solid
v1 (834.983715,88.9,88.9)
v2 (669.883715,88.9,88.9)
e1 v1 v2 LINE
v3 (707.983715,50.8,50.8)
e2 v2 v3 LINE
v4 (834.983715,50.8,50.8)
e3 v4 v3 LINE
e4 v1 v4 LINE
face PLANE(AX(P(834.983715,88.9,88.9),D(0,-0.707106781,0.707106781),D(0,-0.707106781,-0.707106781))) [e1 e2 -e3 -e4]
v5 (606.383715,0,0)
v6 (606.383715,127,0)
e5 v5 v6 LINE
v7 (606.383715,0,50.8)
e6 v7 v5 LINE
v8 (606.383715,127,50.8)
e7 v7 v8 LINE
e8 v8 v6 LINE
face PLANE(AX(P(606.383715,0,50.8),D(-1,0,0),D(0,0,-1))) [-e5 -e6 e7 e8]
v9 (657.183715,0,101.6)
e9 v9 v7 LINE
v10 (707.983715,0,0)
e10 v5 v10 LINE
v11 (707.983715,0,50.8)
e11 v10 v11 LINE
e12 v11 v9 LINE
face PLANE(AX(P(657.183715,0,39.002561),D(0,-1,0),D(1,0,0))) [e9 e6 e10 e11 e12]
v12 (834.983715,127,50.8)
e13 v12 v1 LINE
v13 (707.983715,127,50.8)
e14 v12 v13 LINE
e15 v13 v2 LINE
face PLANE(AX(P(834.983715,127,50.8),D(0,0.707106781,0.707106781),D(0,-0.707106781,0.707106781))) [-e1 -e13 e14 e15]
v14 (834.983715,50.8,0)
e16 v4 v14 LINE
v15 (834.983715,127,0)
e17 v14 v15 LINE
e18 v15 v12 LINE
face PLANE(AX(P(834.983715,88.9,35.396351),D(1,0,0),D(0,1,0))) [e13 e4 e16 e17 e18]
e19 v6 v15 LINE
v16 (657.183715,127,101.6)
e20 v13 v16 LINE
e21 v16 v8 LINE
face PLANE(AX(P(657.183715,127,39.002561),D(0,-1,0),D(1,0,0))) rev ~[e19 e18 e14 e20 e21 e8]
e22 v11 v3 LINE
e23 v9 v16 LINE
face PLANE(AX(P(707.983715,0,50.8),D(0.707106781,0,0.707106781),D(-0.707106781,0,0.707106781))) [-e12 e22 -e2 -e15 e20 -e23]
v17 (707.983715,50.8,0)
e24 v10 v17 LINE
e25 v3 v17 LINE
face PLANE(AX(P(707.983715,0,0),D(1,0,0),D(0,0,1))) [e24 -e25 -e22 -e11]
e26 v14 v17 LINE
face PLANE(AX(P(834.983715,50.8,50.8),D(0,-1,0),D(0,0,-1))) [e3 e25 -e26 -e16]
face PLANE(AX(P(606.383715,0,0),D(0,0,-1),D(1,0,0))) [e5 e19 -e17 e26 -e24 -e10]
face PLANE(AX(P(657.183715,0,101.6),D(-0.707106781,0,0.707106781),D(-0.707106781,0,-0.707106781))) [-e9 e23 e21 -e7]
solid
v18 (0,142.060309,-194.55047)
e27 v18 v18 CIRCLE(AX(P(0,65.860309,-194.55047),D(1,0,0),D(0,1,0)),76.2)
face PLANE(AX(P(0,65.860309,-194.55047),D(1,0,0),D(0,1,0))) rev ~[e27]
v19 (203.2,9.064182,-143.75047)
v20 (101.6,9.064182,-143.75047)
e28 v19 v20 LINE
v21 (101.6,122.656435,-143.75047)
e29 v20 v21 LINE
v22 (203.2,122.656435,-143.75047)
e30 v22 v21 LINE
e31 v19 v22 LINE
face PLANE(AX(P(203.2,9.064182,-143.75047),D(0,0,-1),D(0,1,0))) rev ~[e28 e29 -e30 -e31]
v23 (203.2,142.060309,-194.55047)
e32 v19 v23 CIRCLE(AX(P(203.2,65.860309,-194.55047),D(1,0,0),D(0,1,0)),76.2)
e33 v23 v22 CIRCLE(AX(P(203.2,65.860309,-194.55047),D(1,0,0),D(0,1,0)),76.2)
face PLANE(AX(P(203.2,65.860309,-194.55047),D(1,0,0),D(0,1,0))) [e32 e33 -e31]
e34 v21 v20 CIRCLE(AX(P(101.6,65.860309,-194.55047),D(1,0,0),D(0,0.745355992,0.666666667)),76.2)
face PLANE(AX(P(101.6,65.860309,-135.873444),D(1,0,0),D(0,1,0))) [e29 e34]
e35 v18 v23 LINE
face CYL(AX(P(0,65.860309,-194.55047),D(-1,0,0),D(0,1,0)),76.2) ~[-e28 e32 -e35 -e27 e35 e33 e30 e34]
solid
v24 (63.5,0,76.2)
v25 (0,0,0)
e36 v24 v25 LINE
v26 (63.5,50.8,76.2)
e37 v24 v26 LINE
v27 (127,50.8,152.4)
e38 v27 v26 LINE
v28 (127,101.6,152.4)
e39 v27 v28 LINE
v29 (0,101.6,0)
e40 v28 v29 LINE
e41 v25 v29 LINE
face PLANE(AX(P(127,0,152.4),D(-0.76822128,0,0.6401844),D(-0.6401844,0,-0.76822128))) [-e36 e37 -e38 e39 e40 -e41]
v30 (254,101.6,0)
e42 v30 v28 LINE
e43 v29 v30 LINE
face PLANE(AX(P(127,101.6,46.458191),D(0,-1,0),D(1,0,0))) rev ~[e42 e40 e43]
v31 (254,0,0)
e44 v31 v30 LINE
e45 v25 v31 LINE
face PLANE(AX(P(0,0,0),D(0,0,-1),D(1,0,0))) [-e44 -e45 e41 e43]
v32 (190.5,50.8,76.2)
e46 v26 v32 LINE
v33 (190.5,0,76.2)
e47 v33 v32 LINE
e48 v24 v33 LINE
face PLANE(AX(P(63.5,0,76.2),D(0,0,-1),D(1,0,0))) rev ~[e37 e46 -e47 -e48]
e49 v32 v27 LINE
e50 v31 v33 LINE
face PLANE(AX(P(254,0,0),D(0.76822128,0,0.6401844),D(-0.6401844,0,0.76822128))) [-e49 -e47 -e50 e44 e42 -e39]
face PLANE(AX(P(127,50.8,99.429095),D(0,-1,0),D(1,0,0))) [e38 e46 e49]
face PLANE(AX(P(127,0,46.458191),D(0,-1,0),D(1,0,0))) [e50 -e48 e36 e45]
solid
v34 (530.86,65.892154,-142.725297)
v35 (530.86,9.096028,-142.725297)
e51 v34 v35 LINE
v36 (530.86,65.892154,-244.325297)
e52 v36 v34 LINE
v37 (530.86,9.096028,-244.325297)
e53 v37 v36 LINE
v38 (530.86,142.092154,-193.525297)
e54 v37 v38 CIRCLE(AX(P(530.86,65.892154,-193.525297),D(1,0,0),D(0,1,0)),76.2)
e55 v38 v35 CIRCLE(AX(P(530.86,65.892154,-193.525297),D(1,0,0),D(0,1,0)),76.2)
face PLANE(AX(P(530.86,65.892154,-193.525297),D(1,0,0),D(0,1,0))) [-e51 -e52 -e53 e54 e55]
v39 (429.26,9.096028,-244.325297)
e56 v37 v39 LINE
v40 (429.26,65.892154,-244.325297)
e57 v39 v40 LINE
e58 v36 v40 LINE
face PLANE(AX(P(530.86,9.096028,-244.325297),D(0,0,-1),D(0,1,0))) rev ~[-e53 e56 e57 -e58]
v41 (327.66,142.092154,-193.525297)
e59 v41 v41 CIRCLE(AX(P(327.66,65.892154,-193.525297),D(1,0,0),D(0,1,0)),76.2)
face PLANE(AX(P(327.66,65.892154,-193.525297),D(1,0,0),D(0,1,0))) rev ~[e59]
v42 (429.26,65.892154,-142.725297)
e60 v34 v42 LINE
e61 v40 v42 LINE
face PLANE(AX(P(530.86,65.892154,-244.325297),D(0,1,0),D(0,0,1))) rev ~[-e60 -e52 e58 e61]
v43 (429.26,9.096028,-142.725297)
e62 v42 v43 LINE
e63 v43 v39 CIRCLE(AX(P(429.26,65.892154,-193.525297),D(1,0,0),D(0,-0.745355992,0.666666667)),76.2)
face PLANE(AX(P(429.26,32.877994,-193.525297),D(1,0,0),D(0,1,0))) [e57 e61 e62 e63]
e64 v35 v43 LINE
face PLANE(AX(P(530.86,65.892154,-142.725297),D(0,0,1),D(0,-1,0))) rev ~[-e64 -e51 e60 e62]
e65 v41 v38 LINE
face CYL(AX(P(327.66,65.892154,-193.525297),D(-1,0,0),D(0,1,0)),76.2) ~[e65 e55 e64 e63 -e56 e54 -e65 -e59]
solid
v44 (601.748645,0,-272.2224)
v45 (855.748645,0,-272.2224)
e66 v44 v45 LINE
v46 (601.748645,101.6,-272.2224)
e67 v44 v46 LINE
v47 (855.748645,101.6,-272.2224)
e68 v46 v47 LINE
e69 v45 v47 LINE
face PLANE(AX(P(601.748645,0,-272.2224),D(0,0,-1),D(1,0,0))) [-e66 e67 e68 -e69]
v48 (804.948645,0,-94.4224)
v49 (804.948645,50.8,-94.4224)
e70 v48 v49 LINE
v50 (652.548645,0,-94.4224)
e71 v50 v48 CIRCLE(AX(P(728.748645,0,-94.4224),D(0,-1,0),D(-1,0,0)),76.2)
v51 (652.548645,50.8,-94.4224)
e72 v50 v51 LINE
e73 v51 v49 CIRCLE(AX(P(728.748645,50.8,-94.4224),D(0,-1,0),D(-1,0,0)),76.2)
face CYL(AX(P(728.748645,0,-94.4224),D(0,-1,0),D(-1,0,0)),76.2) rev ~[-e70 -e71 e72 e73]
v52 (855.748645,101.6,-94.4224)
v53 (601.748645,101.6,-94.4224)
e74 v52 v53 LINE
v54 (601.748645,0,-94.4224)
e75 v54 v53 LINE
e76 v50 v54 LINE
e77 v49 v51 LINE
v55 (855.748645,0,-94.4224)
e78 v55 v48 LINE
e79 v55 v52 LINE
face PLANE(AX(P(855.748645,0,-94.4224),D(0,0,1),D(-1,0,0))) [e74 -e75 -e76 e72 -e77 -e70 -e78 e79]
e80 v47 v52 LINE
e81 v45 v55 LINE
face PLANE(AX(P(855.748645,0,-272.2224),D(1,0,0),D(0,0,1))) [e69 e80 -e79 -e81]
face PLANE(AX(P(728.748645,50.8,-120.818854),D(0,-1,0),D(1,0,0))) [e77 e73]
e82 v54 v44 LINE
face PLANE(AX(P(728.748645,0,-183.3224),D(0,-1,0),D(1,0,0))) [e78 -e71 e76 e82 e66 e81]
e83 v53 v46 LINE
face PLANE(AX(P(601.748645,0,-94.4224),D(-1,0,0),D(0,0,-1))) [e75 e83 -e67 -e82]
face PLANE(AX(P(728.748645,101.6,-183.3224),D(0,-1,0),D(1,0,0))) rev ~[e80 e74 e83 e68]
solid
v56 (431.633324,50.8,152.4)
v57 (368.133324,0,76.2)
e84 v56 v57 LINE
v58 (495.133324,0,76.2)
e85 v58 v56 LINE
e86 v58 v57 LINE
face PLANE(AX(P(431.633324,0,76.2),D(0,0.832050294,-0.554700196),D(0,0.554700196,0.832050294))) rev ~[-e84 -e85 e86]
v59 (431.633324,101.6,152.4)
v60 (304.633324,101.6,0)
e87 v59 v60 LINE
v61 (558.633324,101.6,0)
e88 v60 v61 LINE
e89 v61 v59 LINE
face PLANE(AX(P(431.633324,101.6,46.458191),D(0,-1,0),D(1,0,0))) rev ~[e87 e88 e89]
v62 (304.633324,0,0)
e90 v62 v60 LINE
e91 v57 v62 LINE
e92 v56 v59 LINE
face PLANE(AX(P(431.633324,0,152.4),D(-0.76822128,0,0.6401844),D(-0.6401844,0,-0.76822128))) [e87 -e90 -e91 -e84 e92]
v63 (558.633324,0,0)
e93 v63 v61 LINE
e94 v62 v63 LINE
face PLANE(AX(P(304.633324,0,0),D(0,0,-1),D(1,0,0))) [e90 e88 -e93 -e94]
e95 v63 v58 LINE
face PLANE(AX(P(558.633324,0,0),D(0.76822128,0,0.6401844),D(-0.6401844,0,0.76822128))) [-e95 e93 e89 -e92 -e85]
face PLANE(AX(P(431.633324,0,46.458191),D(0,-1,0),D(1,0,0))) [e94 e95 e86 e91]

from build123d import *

# Parameters (mm, degrees)
F1_DEPTH  = 101.6
F3_DEPTH  = 50.8
F5_DEPTH  = 101.6
F9_DEPTH  = 63.5
F11_DEPTH = 127
F15_R     = 76.2
F16_DEPTH = 203.2
F18_DEPTH = 101.6
F20_R     = 76.2
F21_DEPTH = 203.2
F23_DEPTH = 101.6
F25_DEPTH = 101.6
F27_DEPTH = 50.8


with BuildPart() as f1:
    # F0 (on Front) → F1 (new body)
    with BuildSketch(Plane.XZ):
        Polygon((127, 152.4), (0, 0), (254, 0), align=None)
    extrude(amount=-F1_DEPTH)

    # F2 (on face) → F3 (cut)
    with BuildSketch(Plane.XZ):
        Polygon((63.5, 76.2), (127, 76.2), (190.5, 76.2), (127, 152.4), align=None)
    extrude(amount=-F3_DEPTH, mode=Mode.SUBTRACT)


with BuildPart() as f5:
    # F4 (on Front) → F5 (new body)
    with BuildSketch(Plane.XZ):
        Polygon((431.6333237171, 152.4), (304.6333237171, 0), (558.6333237171, 0), align=None)
    extrude(amount=-F5_DEPTH)

    # F8 (on 3pt) → F9 (cut, symmetric)
    with BuildSketch(Plane.YZ.offset(431.6333237171)):
        Polygon((50.8, 152.4), (0, 152.4), (0, 76.2), align=None)
    extrude(amount=F9_DEPTH, both=True, mode=Mode.SUBTRACT)


with BuildPart() as f11:
    # F10 (on Front) → F11 (new body)
    with BuildSketch(Plane.XZ):
        Polygon((606.3837154388, 50.8), (606.3837154388, 0), (657.1837154388, 0), (707.9837154388, 0), (707.9837154388, 50.8), (657.1837154388, 101.6), align=None)
    extrude(amount=-F11_DEPTH)

    # F13 (on offset) → F14 (join, up to the next surface of F11)
    with BuildSketch(Plane.YZ.offset(834.9837154388)):
        Polygon((88.9, 88.9), (50.8, 50.8), (50.8, 0), (127, 0), (127, 50.8), align=None)
    extrude(until=Until.NEXT, dir=(-1, 0, 0))


with BuildPart() as f16:
    # F15 (on Right) → F16 (new body)
    with BuildSketch(Plane.YZ):
        with Locations((65.8603087068, -194.5504695177)):
            Circle(F15_R)
    extrude(amount=F16_DEPTH)

    # F17 (on face) → F18 (cut)
    with BuildSketch(Plane.YZ.offset(203.2)):
        with BuildLine():
            Line((9.0641820783, -143.7504695177), (65.8603087068, -143.7504695177))
            Line((65.8603087068, -143.7504695177), (122.6564353353, -143.7504695177))
            ThreePointArc((122.6564353353, -143.7504695177), (65.8603087068, -118.3504695177), (9.0641820783, -143.7504695177))
        make_face()
    extrude(amount=-F18_DEPTH, mode=Mode.SUBTRACT)


with BuildPart() as f21:
    # F20 (on offset) → F21 (new body)
    with BuildSketch(Plane.YZ.offset(327.66)):
        with Locations((65.8921543072, -193.5252969361)):
            Circle(F20_R)
    extrude(amount=F21_DEPTH)

    # F22 (on face) → F23 (cut)
    with BuildSketch(Plane.YZ.offset(530.86)):
        with BuildLine():
            Line((65.8921543072, -244.3252969361), (65.8921543072, -142.7252969361))
            Line((65.8921543072, -142.7252969361), (9.0960276787, -142.7252969361))
            ThreePointArc((9.0960276787, -142.7252969361), (-10.3078456928, -193.5252969361), (9.0960276787, -244.3252969361))
            Line((9.0960276787, -244.3252969361), (65.8921543072, -244.3252969361))
        make_face()
    extrude(amount=-F23_DEPTH, mode=Mode.SUBTRACT)


with BuildPart() as f25:
    # F24 (on Front) → F25 (new body)
    with BuildSketch(Plane.XZ):
        Polygon((601.7486453056, -94.4223997116), (601.7486453056, -272.2223997116), (855.7486453056, -272.2223997116), (855.7486453056, -94.4223997116), (804.9486453056, -94.4223997116), (652.5486453056, -94.4223997116), align=None)
    extrude(amount=-F25_DEPTH)

    # F26 (on face) → F27 (cut)
    with BuildSketch(Plane.XZ):
        with BuildLine():
            Line((804.9486453056, -94.4223997116), (652.5486453056, -94.4223997116))
            ThreePointArc((652.5486453056, -94.4223997116), (728.7486453056, -170.6223997116), (804.9486453056, -94.4223997116))
        make_face()
    extrude(amount=-F27_DEPTH, mode=Mode.SUBTRACT)


solid = Compound([f1.part, f5.part, f11.part, f16.part, f21.part, f25.part])
